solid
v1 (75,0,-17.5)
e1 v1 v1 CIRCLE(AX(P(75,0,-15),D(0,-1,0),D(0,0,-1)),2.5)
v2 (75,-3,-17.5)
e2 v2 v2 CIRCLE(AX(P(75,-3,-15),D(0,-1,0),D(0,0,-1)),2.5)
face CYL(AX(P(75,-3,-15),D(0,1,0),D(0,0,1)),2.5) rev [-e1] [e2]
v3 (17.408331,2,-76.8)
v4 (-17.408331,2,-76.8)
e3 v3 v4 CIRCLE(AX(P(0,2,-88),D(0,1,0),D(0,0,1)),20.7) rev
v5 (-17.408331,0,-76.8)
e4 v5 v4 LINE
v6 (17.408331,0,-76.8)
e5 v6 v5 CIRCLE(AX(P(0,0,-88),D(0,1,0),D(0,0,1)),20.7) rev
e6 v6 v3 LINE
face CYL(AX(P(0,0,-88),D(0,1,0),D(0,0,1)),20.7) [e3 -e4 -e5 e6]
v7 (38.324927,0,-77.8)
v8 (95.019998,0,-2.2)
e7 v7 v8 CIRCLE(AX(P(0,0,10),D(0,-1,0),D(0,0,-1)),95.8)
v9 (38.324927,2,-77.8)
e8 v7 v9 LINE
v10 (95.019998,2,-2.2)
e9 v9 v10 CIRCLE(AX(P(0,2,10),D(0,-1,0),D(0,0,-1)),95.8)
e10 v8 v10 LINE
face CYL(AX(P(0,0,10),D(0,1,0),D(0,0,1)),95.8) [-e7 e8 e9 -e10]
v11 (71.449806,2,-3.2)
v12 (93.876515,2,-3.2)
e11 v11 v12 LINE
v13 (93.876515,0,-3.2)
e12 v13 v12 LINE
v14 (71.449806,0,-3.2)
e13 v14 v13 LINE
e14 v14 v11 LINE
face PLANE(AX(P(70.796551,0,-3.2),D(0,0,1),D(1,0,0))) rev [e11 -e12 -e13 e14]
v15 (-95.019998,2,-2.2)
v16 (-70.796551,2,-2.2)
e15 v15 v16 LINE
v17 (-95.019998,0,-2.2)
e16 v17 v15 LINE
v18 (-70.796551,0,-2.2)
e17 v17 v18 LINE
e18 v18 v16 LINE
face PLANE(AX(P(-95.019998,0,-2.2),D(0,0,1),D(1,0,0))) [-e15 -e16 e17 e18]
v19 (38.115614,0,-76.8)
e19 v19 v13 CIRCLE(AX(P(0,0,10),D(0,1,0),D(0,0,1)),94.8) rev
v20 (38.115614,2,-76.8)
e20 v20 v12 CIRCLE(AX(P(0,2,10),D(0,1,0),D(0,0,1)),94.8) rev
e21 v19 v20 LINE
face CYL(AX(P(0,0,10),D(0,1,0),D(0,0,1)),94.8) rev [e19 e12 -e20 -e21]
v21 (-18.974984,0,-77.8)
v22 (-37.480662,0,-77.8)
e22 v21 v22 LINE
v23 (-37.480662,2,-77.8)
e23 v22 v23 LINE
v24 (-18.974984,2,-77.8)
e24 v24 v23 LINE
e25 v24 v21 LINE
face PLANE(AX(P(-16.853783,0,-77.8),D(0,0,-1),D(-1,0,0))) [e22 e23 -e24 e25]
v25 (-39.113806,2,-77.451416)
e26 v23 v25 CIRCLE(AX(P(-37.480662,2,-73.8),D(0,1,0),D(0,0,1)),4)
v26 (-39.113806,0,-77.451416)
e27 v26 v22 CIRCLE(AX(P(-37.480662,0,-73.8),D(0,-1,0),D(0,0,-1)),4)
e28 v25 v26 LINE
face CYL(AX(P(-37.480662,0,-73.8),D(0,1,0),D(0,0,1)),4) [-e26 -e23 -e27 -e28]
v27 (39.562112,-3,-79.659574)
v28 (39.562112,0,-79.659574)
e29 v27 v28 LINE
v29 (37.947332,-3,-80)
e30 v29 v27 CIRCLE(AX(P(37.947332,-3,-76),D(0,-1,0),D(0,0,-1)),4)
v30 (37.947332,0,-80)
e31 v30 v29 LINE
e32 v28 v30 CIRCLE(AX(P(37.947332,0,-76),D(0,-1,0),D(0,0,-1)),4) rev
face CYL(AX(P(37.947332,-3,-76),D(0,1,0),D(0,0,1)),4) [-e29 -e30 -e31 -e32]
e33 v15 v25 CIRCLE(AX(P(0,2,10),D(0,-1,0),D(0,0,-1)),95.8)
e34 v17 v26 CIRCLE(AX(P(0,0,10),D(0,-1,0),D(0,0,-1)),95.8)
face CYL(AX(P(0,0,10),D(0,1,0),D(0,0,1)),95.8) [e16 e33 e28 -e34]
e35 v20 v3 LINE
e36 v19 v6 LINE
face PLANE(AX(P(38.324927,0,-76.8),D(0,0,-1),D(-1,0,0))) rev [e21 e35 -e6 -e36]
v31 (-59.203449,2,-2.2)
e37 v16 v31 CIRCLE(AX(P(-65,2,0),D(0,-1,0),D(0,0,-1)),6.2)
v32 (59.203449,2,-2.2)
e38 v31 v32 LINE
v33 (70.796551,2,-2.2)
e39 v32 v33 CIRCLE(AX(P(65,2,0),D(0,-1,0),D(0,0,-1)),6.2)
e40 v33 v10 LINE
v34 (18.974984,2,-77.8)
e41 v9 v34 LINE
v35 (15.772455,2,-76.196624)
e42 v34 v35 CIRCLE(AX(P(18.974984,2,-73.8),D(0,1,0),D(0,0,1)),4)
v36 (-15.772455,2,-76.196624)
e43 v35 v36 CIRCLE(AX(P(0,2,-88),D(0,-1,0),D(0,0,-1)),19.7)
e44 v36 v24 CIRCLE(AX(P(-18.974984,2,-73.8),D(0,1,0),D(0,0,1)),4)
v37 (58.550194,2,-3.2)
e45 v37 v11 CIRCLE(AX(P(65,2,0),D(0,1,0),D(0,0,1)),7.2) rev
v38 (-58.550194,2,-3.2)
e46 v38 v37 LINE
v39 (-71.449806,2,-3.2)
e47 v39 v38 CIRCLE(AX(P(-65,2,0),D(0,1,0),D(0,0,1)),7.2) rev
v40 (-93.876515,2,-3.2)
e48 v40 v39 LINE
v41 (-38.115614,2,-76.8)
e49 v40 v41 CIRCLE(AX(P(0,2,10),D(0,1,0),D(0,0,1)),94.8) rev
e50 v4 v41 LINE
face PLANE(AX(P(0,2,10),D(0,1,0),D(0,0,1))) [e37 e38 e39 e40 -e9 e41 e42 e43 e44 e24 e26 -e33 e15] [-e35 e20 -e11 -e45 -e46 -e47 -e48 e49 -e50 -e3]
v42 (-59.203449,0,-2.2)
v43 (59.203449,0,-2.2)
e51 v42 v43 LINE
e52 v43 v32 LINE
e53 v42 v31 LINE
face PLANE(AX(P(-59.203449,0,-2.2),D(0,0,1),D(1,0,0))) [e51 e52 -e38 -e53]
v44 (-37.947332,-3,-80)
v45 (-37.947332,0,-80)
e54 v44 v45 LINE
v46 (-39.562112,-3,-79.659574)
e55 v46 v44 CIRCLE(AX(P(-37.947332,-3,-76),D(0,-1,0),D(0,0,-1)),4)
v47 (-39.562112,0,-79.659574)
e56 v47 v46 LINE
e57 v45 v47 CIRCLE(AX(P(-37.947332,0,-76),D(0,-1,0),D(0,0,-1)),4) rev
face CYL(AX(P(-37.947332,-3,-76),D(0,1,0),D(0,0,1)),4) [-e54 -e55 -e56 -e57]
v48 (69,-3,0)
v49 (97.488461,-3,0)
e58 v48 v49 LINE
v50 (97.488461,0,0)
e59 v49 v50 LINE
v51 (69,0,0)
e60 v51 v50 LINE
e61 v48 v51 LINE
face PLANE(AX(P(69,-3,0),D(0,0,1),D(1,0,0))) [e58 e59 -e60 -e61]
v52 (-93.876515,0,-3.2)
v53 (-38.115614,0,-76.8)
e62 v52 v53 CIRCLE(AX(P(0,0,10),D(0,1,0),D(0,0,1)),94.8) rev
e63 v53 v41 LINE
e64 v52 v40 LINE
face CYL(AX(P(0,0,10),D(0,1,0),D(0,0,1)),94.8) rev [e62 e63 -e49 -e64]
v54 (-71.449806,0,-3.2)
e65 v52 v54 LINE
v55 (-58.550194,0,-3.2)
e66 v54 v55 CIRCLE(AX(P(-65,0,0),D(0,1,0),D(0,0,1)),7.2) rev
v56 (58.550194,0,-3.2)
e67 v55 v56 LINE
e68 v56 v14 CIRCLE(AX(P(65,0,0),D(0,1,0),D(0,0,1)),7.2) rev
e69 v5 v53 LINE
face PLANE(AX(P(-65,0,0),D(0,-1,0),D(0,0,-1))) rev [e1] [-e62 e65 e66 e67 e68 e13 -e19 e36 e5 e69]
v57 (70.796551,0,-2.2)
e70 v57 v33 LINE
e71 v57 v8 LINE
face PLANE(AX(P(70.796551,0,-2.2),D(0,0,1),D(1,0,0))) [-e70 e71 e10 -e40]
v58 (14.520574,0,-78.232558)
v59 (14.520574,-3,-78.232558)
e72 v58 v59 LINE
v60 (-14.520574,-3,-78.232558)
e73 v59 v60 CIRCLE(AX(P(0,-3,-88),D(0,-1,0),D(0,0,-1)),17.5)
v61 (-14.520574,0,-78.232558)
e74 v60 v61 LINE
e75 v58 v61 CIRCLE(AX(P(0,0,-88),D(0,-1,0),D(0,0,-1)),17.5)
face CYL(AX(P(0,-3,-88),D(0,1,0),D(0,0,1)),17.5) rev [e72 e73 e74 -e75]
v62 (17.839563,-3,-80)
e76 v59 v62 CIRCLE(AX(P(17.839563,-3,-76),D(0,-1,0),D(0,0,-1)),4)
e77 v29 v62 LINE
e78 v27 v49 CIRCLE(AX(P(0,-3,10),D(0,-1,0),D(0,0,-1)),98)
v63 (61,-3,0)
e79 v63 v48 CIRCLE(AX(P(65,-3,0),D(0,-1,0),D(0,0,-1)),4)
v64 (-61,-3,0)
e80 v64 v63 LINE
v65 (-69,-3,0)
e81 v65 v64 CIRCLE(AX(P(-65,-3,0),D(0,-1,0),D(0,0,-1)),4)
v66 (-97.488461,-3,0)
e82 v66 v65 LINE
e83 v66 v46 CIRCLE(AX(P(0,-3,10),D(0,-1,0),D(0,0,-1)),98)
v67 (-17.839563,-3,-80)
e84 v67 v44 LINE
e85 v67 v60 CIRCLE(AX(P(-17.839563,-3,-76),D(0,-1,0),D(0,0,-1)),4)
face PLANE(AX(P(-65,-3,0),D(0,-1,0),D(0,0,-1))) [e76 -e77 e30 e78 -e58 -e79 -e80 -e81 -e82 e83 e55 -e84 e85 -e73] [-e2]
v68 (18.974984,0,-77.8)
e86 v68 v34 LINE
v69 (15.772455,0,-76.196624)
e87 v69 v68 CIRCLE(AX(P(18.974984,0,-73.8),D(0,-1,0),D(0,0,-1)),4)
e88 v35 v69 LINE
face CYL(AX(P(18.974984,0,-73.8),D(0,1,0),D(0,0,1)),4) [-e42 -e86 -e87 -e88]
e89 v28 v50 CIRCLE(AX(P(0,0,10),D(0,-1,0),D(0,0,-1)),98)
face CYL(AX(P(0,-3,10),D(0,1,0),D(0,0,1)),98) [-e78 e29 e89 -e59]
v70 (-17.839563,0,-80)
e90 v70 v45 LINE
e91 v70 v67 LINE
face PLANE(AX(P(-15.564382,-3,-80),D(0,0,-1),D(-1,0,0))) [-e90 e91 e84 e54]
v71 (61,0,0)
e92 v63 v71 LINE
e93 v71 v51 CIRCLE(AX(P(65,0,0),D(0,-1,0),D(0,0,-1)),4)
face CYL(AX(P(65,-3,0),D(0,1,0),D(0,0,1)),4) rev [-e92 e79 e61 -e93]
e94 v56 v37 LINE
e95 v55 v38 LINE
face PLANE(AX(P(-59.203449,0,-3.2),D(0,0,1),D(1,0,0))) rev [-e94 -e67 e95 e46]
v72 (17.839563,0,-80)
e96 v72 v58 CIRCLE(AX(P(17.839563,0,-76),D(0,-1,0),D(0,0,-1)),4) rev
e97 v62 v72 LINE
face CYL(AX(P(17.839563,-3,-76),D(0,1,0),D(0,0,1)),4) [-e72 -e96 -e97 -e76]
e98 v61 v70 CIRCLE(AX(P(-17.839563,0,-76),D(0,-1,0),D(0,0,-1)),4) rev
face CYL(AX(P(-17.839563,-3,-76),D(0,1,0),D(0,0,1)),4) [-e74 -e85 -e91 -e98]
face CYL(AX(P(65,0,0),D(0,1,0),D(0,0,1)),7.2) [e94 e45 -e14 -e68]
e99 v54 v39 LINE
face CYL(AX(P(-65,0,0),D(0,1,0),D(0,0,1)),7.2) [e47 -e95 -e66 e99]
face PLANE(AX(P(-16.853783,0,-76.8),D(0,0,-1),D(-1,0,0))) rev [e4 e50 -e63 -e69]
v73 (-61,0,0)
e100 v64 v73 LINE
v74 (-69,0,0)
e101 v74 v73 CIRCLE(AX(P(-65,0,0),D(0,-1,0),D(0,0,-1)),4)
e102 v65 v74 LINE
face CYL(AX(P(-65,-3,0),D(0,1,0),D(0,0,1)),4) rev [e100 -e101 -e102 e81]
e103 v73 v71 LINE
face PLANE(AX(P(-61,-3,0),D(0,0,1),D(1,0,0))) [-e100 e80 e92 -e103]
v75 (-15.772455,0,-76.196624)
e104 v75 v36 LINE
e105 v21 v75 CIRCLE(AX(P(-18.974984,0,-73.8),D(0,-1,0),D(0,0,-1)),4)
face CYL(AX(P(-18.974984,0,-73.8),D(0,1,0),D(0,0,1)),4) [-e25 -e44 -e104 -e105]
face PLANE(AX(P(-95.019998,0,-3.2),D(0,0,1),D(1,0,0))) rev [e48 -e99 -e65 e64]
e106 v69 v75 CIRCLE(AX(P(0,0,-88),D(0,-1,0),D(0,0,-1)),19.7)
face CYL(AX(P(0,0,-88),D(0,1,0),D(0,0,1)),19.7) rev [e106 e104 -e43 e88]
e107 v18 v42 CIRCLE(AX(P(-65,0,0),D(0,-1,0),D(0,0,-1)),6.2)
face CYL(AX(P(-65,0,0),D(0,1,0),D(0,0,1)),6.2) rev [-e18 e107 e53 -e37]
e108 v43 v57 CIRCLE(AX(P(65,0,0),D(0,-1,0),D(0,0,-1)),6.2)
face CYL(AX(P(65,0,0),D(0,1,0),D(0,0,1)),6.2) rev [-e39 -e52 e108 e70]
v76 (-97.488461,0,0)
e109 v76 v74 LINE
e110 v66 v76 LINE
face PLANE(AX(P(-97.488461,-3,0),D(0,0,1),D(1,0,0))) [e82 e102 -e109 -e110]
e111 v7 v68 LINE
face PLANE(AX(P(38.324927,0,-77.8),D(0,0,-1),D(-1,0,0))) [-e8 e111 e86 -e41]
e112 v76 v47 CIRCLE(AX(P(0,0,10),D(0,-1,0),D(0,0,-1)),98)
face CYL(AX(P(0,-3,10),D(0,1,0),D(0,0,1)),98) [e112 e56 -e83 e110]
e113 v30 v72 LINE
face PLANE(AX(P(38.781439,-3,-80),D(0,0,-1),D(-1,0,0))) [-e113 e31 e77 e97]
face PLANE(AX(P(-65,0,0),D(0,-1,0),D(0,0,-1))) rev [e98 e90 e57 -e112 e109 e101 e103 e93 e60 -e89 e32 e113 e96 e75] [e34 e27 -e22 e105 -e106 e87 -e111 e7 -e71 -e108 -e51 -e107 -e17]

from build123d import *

# Parameters (mm, degrees)
SKETCH_1_R      = 2.5
EXTRUDE_1_DEPTH = 3
THICKEN_1_DEPTH = 2
FILLET_6_R      = 4


# Read off the part's stored shape, not the designer's step: 加厚1
with BuildPart() as part:
    # 草图1 → 凸台-拉伸1 (new body)
    with BuildSketch(Plane.XZ):
        with BuildLine():
            Line((-97.488460856, 0), (-69, 0))
            ThreePointArc((-69, 0), (-65, -4), (-61, 0))
            Line((-61, 0), (61, 0))
            ThreePointArc((61, 0), (65, -4), (69, 0))
            Line((69, 0), (97.488460856, 0))
            ThreePointArc((97.488460856, 0), (79.00867922, -47.979553361), (38.781438859, -80))
            Line((38.781438859, -80), (15.564382416, -80))
            ThreePointArc((15.564382416, -80), (0, -70.5), (-15.564382416, -80))
            Line((-15.564382416, -80), (-38.781438859, -80))
            ThreePointArc((-38.781438859, -80), (-79.00867922, -47.979553361), (-97.488460856, 0))
        make_face()
        with Locations(Location((75, -15, 0), (0, 0, 270))):
            Circle(SKETCH_1_R, mode=Mode.SUBTRACT)
    extrude(amount=EXTRUDE_1_DEPTH)

    # 加厚1 outline → 加厚1 (add)
    with BuildSketch(Plane(origin=(0, 0, 0), x_dir=(1, 0, 0), z_dir=(0, 1, 0))):
        with BuildLine():
            ThreePointArc((16.853782958, 77.8), (0, 68.3), (-16.853782958, 77.8))
            Line((-16.853782958, 77.8), (-38.324926614, 77.8))
            ThreePointArc((-38.324926614, 77.8), (-76.642398339, 47.476802076), (-95.019997895, 2.2))
            Line((-95.019997895, 2.2), (-70.796550698, 2.2))
            ThreePointArc((-70.796550698, 2.2), (-65, 6.2), (-59.203449302, 2.2))
            Line((-59.203449302, 2.2), (59.203449302, 2.2))
            ThreePointArc((59.203449302, 2.2), (65, 6.2), (70.796550698, 2.2))
            Line((70.796550698, 2.2), (95.019997895, 2.2))
            ThreePointArc((95.019997895, 2.2), (76.642398339, 47.476802076), (38.324926614, 77.8))
            Line((38.324926614, 77.8), (16.853782958, 77.8))
        make_face()
        with BuildLine():
            Line((-38.115613599, 76.8), (-17.408331339, 76.8))
            ThreePointArc((-17.408331339, 76.8), (0, 67.3), (17.408331339, 76.8))
            Line((17.408331339, 76.8), (38.115613599, 76.8))
            ThreePointArc((38.115613599, 76.8), (75.562692375, 47.247877874), (93.876514635, 3.2))
            Line((93.876514635, 3.2), (71.449806199, 3.2))
            ThreePointArc((71.449806199, 3.2), (65, 7.2), (58.550193801, 3.2))
            Line((58.550193801, 3.2), (-58.550193801, 3.2))
            ThreePointArc((-58.550193801, 3.2), (-65, 7.2), (-71.449806199, 3.2))
            Line((-71.449806199, 3.2), (-93.876514635, 3.2))
            ThreePointArc((-93.876514635, 3.2), (-75.562692375, 47.247877874), (-38.115613599, 76.8))
        make_face(mode=Mode.SUBTRACT)
    extrude(amount=THICKEN_1_DEPTH)

    # 圆角6
    fillet_6_edges = [part.edges().sort_by_distance(p)[0] for p in [
        (-38.781438859, -1.5, -80),
        (-15.564382416, -1.5, -80),
        (15.564382416, -1.5, -80),
        (38.781438859, -1.5, -80),
        (-38.324926614, 1, -77.8),
        (-16.853782958, 1, -77.8),
        (16.853782958, 1, -77.8),
    ]]
    fillet(fillet_6_edges, radius=FILLET_6_R)


solid = part.part
